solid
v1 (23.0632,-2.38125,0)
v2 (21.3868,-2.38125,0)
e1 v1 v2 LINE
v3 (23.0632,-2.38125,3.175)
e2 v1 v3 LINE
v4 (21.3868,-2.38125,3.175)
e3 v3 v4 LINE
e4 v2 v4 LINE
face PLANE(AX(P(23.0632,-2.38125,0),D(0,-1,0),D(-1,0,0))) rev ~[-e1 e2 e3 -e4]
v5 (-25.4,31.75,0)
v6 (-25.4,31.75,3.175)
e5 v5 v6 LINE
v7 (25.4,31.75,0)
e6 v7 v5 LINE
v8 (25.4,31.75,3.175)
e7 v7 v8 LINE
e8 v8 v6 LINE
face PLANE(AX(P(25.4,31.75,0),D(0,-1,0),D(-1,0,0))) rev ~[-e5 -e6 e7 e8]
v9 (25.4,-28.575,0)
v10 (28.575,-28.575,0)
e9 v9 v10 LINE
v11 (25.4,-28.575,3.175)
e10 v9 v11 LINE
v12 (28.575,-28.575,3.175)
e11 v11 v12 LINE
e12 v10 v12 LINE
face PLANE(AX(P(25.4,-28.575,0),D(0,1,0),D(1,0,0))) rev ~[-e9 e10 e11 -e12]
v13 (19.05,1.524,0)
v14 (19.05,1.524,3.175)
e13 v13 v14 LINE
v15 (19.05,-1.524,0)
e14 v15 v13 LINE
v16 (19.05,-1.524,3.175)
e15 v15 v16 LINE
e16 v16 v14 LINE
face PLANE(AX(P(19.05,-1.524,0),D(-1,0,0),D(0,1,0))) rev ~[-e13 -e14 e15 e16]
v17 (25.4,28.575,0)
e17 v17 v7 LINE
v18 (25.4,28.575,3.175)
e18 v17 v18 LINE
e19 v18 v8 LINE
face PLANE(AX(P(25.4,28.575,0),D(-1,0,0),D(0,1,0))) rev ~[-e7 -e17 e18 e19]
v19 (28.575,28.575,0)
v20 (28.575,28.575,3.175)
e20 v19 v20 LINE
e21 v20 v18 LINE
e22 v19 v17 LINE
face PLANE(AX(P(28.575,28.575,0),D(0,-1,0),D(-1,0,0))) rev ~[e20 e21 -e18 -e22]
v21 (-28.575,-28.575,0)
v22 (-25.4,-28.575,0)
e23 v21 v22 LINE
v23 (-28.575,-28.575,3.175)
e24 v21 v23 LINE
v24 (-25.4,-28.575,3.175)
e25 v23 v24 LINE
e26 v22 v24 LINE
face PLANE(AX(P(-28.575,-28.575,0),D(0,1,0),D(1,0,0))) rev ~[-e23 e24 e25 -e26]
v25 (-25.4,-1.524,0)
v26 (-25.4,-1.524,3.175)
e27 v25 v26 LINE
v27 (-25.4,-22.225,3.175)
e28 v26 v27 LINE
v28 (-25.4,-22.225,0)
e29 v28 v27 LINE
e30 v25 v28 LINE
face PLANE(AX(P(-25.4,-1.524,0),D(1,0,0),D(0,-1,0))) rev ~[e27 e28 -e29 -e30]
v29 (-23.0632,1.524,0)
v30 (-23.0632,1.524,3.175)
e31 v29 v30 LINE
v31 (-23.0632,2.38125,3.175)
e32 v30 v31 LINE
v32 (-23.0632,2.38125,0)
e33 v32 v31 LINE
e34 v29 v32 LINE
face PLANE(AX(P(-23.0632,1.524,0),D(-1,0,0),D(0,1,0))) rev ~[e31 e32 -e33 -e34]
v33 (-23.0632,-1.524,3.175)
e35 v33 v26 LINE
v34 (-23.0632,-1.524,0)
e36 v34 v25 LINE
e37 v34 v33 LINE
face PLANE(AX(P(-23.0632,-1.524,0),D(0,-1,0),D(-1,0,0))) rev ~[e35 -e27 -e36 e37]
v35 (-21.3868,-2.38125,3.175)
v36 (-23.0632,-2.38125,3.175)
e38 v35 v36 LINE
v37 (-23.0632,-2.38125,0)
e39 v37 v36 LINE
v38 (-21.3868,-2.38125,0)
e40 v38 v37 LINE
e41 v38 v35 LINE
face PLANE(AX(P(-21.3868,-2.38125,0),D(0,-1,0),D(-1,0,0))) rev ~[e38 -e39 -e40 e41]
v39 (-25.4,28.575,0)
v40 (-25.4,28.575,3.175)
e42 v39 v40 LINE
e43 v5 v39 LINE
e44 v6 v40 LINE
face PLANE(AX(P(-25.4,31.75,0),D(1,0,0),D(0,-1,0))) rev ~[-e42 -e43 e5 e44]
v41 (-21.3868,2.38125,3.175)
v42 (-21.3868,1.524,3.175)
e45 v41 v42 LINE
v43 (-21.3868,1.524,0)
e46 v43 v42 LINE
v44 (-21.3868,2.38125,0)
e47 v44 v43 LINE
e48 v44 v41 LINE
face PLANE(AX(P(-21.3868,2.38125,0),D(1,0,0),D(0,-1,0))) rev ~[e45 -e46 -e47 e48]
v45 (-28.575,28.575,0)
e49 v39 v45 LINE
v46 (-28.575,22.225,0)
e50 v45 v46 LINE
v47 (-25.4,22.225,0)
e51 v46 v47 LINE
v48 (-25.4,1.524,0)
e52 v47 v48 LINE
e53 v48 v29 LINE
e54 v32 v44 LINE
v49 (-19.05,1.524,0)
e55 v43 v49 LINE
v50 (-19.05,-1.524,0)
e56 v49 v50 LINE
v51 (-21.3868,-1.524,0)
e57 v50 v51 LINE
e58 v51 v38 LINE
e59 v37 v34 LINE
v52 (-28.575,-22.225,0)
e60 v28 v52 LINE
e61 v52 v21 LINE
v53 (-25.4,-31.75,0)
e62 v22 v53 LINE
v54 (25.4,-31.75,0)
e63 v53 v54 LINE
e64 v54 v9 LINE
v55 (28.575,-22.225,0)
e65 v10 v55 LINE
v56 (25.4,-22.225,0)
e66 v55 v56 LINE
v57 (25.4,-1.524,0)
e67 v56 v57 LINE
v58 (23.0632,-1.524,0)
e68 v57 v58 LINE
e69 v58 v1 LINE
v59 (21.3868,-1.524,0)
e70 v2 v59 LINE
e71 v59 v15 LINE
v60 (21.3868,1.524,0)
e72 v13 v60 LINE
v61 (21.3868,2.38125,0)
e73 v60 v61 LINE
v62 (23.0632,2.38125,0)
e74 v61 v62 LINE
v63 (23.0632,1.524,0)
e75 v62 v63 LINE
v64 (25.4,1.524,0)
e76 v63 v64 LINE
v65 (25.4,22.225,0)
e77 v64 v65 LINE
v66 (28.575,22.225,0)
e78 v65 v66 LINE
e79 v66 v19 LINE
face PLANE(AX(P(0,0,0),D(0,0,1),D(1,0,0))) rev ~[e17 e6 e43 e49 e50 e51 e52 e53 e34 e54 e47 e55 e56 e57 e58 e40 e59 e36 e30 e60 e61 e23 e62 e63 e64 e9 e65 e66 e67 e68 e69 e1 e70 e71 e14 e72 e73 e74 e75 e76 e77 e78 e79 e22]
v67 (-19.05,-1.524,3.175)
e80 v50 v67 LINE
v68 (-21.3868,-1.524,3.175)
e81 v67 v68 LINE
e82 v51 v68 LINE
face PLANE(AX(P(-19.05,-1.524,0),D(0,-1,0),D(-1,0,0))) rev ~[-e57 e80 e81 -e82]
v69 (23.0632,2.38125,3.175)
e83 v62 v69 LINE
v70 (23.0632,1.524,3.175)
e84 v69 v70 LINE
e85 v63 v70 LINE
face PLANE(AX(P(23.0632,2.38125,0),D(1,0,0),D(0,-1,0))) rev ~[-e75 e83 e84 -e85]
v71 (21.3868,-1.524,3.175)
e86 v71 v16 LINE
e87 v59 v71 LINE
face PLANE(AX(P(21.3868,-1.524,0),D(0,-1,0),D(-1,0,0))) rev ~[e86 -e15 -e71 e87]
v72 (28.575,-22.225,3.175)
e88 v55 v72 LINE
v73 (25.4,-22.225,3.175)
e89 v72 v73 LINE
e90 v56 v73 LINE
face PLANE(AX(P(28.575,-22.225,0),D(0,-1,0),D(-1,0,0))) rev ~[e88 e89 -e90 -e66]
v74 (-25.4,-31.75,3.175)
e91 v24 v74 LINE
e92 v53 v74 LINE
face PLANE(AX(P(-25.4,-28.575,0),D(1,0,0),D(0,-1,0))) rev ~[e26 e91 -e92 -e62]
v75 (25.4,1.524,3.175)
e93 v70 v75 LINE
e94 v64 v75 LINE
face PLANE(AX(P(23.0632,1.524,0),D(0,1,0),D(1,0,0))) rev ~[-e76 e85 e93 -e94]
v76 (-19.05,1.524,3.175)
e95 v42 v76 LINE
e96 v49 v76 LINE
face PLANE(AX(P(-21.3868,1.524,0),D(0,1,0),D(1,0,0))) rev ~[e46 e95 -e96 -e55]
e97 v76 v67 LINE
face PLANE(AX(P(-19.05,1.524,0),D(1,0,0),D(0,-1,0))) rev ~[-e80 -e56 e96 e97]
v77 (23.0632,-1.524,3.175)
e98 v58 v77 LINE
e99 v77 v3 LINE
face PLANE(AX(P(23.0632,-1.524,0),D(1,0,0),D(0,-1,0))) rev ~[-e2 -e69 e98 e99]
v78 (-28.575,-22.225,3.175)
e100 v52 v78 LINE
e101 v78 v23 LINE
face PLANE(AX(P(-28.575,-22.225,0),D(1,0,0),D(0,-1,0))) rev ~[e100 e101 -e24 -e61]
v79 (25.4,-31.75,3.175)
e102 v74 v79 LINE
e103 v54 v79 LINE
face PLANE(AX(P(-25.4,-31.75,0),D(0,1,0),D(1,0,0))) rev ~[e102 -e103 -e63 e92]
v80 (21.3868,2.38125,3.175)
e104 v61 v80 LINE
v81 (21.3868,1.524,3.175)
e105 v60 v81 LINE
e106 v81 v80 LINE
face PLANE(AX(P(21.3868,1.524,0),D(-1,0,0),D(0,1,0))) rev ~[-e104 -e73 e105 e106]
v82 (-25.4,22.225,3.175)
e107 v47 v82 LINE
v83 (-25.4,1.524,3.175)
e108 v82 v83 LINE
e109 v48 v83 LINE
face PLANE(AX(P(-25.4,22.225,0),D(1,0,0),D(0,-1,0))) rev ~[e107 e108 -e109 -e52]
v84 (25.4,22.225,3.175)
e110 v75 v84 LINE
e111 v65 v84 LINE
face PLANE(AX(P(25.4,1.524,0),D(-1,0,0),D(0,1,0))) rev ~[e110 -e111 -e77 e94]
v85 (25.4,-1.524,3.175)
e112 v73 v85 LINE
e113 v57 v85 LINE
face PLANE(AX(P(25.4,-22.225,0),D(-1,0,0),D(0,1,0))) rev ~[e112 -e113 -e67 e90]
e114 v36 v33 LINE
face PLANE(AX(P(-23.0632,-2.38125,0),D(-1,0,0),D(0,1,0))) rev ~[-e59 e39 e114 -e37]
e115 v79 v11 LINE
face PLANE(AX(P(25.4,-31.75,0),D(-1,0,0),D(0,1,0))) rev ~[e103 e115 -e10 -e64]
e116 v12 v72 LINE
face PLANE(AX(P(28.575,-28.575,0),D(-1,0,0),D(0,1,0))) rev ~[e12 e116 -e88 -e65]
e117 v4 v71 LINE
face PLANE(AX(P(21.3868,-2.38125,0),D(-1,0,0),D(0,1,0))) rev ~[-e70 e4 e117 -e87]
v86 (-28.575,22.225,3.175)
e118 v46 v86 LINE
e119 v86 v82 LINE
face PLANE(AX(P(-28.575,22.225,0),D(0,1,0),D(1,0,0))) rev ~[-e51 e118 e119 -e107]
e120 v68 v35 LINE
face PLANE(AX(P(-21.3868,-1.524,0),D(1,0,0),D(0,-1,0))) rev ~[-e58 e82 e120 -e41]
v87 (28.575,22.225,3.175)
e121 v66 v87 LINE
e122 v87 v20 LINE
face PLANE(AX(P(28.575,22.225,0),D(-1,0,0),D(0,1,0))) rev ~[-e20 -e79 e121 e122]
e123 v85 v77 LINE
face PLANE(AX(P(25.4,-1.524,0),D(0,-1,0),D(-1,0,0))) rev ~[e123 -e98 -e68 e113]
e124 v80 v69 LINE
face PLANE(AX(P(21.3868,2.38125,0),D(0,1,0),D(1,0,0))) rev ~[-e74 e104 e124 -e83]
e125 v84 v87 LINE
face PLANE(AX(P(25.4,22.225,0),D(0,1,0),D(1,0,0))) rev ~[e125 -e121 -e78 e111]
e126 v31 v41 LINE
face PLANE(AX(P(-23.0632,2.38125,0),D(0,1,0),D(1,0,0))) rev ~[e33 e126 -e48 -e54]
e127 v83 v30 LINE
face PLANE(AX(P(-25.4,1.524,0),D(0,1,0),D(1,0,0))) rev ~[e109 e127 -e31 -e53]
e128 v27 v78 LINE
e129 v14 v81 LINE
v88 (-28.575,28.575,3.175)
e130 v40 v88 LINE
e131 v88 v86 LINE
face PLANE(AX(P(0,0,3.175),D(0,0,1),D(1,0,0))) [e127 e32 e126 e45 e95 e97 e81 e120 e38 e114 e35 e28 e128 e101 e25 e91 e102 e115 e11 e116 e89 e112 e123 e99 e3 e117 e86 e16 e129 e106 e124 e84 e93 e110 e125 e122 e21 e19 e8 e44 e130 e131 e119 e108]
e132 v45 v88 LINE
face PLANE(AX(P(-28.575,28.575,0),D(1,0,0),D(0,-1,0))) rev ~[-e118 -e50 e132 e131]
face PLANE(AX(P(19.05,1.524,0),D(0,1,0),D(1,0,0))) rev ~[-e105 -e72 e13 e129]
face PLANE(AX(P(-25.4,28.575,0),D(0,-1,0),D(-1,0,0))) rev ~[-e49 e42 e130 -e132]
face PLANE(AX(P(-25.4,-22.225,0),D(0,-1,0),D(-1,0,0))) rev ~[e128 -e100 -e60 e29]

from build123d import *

# Parameters (mm, degrees)
F1_DEPTH = 3.175


# Not quite as in the source:
# - a length typed as a fraction of an inch, garbled in the dataset ("3 / 203.2 mm" for 3/8 in), is restored


with BuildPart() as f1:
    # F0 (on Top) → F1 (new body)
    with BuildSketch(Plane.XY):
        Polygon((25.4, 28.575), (25.4, 31.75), (-25.4, 31.75), (-25.4, 28.575), (-28.575, 28.575), (-28.575, 22.225), (-25.4, 22.225), (-25.4, 1.524), (-23.0632, 1.524), (-23.0632, 2.38125), (-21.3868, 2.38125), (-21.3868, 1.524), (-19.05, 1.524), (-19.05, -1.524), (-21.3868, -1.524), (-21.3868, -2.38125), (-23.0632, -2.38125), (-23.0632, -1.524), (-25.4, -1.524), (-25.4, -22.225), (-28.575, -22.225), (-28.575, -28.575), (-25.4, -28.575), (-25.4, -31.75), (25.4, -31.75), (25.4, -28.575), (28.575, -28.575), (28.575, -22.225), (25.4, -22.225), (25.4, -1.524), (23.0632, -1.524), (23.0632, -2.38125), (21.3868, -2.38125), (21.3868, -1.524), (19.05, -1.524), (19.05, 1.524), (21.3868, 1.524), (21.3868, 2.38125), (23.0632, 2.38125), (23.0632, 1.524), (25.4, 1.524), (25.4, 22.225), (28.575, 22.225), (28.575, 28.575), align=None)
    extrude(amount=F1_DEPTH)


solid = f1.part
